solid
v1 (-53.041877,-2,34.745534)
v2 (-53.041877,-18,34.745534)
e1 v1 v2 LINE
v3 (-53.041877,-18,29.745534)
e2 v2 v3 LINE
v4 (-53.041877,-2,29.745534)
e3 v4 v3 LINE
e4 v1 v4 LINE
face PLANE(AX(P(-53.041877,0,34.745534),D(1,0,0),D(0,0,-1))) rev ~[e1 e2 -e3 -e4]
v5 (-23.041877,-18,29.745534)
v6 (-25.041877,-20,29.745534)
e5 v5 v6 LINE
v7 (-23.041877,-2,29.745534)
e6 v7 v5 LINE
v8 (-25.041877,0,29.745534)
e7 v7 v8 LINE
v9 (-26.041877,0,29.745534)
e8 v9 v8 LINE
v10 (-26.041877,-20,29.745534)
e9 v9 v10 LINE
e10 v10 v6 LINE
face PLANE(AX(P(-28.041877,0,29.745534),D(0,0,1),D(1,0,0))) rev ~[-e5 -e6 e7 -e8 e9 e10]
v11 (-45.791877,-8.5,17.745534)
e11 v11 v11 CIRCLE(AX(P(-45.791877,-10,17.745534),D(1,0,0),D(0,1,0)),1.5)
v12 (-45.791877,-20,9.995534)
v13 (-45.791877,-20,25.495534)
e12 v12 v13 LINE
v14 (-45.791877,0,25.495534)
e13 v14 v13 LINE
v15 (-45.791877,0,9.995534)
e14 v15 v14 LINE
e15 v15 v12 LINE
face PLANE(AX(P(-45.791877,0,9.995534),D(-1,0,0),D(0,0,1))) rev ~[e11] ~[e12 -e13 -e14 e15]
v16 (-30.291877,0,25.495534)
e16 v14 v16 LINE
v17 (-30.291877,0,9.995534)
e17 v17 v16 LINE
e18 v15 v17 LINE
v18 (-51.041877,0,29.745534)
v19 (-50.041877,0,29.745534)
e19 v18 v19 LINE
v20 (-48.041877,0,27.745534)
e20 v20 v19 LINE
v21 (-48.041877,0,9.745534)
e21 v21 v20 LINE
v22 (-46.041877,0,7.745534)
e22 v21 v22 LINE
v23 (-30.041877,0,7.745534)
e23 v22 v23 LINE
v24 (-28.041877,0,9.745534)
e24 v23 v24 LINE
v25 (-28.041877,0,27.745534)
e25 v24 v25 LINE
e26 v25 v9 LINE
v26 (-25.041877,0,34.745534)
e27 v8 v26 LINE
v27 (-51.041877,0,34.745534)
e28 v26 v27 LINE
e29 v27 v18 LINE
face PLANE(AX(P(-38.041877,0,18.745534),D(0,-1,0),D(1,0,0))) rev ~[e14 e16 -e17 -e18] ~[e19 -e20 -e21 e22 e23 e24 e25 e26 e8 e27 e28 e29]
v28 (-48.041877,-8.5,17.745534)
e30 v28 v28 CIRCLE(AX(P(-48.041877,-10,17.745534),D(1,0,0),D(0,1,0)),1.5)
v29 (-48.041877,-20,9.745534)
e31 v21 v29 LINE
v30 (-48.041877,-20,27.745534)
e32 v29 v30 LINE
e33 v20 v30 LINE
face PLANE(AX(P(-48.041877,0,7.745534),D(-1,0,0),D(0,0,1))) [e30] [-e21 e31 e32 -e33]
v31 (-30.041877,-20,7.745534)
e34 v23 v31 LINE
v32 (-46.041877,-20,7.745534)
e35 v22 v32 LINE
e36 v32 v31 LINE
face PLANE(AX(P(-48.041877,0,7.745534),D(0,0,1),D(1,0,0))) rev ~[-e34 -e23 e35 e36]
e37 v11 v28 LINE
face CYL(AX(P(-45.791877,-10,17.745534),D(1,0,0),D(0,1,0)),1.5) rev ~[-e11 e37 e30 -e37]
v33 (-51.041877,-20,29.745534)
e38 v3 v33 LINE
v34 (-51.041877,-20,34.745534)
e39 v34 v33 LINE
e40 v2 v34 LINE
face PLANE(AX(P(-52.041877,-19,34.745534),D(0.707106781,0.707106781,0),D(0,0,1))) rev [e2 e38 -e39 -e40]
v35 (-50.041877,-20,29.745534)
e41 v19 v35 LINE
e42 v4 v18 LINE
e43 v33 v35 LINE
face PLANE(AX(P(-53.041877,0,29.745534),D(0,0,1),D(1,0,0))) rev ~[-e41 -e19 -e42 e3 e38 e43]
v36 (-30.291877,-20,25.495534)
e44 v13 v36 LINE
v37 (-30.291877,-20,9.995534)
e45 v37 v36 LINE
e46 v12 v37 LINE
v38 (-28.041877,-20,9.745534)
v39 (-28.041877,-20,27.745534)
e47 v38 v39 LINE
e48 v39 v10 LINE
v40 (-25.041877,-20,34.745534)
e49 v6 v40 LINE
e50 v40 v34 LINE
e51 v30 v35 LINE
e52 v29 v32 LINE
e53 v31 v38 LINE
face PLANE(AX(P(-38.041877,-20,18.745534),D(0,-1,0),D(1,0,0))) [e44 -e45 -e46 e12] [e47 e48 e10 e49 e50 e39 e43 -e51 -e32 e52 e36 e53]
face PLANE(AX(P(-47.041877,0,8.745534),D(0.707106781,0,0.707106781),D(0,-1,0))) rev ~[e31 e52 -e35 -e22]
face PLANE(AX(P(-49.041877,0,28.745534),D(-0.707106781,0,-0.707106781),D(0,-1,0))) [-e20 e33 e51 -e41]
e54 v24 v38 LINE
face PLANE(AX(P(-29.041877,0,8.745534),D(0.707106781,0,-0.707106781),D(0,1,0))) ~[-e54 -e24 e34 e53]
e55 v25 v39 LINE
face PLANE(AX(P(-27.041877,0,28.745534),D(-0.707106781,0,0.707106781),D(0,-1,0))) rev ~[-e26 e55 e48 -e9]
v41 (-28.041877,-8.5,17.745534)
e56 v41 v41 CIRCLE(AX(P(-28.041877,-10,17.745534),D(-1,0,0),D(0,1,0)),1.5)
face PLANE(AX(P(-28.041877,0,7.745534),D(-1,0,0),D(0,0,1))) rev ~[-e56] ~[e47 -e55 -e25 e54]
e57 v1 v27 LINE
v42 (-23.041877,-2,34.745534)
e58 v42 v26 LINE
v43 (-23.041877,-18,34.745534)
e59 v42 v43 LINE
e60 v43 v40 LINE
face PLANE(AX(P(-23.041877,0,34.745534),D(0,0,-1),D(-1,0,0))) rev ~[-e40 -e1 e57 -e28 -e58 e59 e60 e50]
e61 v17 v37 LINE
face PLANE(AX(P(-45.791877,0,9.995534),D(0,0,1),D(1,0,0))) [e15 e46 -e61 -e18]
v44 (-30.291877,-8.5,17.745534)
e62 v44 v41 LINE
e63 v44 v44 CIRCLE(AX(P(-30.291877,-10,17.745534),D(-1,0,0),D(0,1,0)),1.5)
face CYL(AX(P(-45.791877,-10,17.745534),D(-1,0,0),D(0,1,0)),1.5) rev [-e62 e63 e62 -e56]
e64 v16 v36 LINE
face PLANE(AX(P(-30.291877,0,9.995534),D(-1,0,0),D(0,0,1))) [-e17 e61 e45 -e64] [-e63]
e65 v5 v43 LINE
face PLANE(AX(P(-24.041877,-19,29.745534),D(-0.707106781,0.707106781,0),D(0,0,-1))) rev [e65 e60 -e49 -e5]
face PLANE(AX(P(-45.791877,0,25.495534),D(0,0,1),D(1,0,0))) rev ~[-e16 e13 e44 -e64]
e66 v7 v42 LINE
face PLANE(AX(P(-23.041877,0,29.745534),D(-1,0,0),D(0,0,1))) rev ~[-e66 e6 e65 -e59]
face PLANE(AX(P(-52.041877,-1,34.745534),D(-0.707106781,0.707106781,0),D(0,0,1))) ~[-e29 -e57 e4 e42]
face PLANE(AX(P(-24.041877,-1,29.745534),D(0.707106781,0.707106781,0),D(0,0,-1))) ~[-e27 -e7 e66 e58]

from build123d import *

# Parameters (mm, degrees)
F0_W          = 20
F0_H          = 22
F0_W_2        = 15.5
F0_H_2        = 15.5
F1_DEPTH      = 20
F2_SIZE       = 2
F3_R          = 1.5
F4_DEPTH      = 7.251
F4_DEPTH_BACK = 25


# Not quite as in the source:
# - a feature names something its author has since deleted; it is built from what else it names


with BuildPart() as f1:
    # F0 (on Front) → F1 (new body)
    with BuildSketch(Plane.XZ):
        with Locations((-38.0418774337, 18.7455339581)):
            Rectangle(F0_W, F0_H)
        with Locations((-38.0418774337, 17.7455339581)):
            Rectangle(F0_W_2, F0_H_2, mode=Mode.SUBTRACT)
        Polygon((-48.0418774337, 29.7455339581), (-28.0418774337, 29.7455339581), (-23.0418774337, 29.7455339581), (-23.0418774337, 34.7455339581), (-53.0418774337, 34.7455339581), (-53.0418774337, 29.7455339581), align=None)
    extrude(amount=F1_DEPTH)

    # F2
    f2_edges = [f1.edges().sort_by_distance(p)[0] for p in [
        (-28.041877, -10, 7.745534),
        (-48.041877, -10, 7.745534),
        (-48.041877, -10, 29.745534),
        (-28.041877, -10, 29.745534),
        (-23.041877, 0, 32.245534),
        (-53.041877, 0, 32.245534),
        (-53.041877, -20, 32.245534),
        (-23.041877, -20, 32.245534),
    ]]
    chamfer(f2_edges, length=F2_SIZE)

    # F3 (on face) → F4 (cut, two sides)
    with BuildSketch(Plane.YZ.offset(-45.7918774337)) as f4_sk:
        with Locations((-10, 17.7455339581)):
            Circle(F3_R)
    extrude(amount=-F4_DEPTH, mode=Mode.SUBTRACT)
    extrude(f4_sk.sketch, amount=F4_DEPTH_BACK, mode=Mode.SUBTRACT)


solid = f1.part
